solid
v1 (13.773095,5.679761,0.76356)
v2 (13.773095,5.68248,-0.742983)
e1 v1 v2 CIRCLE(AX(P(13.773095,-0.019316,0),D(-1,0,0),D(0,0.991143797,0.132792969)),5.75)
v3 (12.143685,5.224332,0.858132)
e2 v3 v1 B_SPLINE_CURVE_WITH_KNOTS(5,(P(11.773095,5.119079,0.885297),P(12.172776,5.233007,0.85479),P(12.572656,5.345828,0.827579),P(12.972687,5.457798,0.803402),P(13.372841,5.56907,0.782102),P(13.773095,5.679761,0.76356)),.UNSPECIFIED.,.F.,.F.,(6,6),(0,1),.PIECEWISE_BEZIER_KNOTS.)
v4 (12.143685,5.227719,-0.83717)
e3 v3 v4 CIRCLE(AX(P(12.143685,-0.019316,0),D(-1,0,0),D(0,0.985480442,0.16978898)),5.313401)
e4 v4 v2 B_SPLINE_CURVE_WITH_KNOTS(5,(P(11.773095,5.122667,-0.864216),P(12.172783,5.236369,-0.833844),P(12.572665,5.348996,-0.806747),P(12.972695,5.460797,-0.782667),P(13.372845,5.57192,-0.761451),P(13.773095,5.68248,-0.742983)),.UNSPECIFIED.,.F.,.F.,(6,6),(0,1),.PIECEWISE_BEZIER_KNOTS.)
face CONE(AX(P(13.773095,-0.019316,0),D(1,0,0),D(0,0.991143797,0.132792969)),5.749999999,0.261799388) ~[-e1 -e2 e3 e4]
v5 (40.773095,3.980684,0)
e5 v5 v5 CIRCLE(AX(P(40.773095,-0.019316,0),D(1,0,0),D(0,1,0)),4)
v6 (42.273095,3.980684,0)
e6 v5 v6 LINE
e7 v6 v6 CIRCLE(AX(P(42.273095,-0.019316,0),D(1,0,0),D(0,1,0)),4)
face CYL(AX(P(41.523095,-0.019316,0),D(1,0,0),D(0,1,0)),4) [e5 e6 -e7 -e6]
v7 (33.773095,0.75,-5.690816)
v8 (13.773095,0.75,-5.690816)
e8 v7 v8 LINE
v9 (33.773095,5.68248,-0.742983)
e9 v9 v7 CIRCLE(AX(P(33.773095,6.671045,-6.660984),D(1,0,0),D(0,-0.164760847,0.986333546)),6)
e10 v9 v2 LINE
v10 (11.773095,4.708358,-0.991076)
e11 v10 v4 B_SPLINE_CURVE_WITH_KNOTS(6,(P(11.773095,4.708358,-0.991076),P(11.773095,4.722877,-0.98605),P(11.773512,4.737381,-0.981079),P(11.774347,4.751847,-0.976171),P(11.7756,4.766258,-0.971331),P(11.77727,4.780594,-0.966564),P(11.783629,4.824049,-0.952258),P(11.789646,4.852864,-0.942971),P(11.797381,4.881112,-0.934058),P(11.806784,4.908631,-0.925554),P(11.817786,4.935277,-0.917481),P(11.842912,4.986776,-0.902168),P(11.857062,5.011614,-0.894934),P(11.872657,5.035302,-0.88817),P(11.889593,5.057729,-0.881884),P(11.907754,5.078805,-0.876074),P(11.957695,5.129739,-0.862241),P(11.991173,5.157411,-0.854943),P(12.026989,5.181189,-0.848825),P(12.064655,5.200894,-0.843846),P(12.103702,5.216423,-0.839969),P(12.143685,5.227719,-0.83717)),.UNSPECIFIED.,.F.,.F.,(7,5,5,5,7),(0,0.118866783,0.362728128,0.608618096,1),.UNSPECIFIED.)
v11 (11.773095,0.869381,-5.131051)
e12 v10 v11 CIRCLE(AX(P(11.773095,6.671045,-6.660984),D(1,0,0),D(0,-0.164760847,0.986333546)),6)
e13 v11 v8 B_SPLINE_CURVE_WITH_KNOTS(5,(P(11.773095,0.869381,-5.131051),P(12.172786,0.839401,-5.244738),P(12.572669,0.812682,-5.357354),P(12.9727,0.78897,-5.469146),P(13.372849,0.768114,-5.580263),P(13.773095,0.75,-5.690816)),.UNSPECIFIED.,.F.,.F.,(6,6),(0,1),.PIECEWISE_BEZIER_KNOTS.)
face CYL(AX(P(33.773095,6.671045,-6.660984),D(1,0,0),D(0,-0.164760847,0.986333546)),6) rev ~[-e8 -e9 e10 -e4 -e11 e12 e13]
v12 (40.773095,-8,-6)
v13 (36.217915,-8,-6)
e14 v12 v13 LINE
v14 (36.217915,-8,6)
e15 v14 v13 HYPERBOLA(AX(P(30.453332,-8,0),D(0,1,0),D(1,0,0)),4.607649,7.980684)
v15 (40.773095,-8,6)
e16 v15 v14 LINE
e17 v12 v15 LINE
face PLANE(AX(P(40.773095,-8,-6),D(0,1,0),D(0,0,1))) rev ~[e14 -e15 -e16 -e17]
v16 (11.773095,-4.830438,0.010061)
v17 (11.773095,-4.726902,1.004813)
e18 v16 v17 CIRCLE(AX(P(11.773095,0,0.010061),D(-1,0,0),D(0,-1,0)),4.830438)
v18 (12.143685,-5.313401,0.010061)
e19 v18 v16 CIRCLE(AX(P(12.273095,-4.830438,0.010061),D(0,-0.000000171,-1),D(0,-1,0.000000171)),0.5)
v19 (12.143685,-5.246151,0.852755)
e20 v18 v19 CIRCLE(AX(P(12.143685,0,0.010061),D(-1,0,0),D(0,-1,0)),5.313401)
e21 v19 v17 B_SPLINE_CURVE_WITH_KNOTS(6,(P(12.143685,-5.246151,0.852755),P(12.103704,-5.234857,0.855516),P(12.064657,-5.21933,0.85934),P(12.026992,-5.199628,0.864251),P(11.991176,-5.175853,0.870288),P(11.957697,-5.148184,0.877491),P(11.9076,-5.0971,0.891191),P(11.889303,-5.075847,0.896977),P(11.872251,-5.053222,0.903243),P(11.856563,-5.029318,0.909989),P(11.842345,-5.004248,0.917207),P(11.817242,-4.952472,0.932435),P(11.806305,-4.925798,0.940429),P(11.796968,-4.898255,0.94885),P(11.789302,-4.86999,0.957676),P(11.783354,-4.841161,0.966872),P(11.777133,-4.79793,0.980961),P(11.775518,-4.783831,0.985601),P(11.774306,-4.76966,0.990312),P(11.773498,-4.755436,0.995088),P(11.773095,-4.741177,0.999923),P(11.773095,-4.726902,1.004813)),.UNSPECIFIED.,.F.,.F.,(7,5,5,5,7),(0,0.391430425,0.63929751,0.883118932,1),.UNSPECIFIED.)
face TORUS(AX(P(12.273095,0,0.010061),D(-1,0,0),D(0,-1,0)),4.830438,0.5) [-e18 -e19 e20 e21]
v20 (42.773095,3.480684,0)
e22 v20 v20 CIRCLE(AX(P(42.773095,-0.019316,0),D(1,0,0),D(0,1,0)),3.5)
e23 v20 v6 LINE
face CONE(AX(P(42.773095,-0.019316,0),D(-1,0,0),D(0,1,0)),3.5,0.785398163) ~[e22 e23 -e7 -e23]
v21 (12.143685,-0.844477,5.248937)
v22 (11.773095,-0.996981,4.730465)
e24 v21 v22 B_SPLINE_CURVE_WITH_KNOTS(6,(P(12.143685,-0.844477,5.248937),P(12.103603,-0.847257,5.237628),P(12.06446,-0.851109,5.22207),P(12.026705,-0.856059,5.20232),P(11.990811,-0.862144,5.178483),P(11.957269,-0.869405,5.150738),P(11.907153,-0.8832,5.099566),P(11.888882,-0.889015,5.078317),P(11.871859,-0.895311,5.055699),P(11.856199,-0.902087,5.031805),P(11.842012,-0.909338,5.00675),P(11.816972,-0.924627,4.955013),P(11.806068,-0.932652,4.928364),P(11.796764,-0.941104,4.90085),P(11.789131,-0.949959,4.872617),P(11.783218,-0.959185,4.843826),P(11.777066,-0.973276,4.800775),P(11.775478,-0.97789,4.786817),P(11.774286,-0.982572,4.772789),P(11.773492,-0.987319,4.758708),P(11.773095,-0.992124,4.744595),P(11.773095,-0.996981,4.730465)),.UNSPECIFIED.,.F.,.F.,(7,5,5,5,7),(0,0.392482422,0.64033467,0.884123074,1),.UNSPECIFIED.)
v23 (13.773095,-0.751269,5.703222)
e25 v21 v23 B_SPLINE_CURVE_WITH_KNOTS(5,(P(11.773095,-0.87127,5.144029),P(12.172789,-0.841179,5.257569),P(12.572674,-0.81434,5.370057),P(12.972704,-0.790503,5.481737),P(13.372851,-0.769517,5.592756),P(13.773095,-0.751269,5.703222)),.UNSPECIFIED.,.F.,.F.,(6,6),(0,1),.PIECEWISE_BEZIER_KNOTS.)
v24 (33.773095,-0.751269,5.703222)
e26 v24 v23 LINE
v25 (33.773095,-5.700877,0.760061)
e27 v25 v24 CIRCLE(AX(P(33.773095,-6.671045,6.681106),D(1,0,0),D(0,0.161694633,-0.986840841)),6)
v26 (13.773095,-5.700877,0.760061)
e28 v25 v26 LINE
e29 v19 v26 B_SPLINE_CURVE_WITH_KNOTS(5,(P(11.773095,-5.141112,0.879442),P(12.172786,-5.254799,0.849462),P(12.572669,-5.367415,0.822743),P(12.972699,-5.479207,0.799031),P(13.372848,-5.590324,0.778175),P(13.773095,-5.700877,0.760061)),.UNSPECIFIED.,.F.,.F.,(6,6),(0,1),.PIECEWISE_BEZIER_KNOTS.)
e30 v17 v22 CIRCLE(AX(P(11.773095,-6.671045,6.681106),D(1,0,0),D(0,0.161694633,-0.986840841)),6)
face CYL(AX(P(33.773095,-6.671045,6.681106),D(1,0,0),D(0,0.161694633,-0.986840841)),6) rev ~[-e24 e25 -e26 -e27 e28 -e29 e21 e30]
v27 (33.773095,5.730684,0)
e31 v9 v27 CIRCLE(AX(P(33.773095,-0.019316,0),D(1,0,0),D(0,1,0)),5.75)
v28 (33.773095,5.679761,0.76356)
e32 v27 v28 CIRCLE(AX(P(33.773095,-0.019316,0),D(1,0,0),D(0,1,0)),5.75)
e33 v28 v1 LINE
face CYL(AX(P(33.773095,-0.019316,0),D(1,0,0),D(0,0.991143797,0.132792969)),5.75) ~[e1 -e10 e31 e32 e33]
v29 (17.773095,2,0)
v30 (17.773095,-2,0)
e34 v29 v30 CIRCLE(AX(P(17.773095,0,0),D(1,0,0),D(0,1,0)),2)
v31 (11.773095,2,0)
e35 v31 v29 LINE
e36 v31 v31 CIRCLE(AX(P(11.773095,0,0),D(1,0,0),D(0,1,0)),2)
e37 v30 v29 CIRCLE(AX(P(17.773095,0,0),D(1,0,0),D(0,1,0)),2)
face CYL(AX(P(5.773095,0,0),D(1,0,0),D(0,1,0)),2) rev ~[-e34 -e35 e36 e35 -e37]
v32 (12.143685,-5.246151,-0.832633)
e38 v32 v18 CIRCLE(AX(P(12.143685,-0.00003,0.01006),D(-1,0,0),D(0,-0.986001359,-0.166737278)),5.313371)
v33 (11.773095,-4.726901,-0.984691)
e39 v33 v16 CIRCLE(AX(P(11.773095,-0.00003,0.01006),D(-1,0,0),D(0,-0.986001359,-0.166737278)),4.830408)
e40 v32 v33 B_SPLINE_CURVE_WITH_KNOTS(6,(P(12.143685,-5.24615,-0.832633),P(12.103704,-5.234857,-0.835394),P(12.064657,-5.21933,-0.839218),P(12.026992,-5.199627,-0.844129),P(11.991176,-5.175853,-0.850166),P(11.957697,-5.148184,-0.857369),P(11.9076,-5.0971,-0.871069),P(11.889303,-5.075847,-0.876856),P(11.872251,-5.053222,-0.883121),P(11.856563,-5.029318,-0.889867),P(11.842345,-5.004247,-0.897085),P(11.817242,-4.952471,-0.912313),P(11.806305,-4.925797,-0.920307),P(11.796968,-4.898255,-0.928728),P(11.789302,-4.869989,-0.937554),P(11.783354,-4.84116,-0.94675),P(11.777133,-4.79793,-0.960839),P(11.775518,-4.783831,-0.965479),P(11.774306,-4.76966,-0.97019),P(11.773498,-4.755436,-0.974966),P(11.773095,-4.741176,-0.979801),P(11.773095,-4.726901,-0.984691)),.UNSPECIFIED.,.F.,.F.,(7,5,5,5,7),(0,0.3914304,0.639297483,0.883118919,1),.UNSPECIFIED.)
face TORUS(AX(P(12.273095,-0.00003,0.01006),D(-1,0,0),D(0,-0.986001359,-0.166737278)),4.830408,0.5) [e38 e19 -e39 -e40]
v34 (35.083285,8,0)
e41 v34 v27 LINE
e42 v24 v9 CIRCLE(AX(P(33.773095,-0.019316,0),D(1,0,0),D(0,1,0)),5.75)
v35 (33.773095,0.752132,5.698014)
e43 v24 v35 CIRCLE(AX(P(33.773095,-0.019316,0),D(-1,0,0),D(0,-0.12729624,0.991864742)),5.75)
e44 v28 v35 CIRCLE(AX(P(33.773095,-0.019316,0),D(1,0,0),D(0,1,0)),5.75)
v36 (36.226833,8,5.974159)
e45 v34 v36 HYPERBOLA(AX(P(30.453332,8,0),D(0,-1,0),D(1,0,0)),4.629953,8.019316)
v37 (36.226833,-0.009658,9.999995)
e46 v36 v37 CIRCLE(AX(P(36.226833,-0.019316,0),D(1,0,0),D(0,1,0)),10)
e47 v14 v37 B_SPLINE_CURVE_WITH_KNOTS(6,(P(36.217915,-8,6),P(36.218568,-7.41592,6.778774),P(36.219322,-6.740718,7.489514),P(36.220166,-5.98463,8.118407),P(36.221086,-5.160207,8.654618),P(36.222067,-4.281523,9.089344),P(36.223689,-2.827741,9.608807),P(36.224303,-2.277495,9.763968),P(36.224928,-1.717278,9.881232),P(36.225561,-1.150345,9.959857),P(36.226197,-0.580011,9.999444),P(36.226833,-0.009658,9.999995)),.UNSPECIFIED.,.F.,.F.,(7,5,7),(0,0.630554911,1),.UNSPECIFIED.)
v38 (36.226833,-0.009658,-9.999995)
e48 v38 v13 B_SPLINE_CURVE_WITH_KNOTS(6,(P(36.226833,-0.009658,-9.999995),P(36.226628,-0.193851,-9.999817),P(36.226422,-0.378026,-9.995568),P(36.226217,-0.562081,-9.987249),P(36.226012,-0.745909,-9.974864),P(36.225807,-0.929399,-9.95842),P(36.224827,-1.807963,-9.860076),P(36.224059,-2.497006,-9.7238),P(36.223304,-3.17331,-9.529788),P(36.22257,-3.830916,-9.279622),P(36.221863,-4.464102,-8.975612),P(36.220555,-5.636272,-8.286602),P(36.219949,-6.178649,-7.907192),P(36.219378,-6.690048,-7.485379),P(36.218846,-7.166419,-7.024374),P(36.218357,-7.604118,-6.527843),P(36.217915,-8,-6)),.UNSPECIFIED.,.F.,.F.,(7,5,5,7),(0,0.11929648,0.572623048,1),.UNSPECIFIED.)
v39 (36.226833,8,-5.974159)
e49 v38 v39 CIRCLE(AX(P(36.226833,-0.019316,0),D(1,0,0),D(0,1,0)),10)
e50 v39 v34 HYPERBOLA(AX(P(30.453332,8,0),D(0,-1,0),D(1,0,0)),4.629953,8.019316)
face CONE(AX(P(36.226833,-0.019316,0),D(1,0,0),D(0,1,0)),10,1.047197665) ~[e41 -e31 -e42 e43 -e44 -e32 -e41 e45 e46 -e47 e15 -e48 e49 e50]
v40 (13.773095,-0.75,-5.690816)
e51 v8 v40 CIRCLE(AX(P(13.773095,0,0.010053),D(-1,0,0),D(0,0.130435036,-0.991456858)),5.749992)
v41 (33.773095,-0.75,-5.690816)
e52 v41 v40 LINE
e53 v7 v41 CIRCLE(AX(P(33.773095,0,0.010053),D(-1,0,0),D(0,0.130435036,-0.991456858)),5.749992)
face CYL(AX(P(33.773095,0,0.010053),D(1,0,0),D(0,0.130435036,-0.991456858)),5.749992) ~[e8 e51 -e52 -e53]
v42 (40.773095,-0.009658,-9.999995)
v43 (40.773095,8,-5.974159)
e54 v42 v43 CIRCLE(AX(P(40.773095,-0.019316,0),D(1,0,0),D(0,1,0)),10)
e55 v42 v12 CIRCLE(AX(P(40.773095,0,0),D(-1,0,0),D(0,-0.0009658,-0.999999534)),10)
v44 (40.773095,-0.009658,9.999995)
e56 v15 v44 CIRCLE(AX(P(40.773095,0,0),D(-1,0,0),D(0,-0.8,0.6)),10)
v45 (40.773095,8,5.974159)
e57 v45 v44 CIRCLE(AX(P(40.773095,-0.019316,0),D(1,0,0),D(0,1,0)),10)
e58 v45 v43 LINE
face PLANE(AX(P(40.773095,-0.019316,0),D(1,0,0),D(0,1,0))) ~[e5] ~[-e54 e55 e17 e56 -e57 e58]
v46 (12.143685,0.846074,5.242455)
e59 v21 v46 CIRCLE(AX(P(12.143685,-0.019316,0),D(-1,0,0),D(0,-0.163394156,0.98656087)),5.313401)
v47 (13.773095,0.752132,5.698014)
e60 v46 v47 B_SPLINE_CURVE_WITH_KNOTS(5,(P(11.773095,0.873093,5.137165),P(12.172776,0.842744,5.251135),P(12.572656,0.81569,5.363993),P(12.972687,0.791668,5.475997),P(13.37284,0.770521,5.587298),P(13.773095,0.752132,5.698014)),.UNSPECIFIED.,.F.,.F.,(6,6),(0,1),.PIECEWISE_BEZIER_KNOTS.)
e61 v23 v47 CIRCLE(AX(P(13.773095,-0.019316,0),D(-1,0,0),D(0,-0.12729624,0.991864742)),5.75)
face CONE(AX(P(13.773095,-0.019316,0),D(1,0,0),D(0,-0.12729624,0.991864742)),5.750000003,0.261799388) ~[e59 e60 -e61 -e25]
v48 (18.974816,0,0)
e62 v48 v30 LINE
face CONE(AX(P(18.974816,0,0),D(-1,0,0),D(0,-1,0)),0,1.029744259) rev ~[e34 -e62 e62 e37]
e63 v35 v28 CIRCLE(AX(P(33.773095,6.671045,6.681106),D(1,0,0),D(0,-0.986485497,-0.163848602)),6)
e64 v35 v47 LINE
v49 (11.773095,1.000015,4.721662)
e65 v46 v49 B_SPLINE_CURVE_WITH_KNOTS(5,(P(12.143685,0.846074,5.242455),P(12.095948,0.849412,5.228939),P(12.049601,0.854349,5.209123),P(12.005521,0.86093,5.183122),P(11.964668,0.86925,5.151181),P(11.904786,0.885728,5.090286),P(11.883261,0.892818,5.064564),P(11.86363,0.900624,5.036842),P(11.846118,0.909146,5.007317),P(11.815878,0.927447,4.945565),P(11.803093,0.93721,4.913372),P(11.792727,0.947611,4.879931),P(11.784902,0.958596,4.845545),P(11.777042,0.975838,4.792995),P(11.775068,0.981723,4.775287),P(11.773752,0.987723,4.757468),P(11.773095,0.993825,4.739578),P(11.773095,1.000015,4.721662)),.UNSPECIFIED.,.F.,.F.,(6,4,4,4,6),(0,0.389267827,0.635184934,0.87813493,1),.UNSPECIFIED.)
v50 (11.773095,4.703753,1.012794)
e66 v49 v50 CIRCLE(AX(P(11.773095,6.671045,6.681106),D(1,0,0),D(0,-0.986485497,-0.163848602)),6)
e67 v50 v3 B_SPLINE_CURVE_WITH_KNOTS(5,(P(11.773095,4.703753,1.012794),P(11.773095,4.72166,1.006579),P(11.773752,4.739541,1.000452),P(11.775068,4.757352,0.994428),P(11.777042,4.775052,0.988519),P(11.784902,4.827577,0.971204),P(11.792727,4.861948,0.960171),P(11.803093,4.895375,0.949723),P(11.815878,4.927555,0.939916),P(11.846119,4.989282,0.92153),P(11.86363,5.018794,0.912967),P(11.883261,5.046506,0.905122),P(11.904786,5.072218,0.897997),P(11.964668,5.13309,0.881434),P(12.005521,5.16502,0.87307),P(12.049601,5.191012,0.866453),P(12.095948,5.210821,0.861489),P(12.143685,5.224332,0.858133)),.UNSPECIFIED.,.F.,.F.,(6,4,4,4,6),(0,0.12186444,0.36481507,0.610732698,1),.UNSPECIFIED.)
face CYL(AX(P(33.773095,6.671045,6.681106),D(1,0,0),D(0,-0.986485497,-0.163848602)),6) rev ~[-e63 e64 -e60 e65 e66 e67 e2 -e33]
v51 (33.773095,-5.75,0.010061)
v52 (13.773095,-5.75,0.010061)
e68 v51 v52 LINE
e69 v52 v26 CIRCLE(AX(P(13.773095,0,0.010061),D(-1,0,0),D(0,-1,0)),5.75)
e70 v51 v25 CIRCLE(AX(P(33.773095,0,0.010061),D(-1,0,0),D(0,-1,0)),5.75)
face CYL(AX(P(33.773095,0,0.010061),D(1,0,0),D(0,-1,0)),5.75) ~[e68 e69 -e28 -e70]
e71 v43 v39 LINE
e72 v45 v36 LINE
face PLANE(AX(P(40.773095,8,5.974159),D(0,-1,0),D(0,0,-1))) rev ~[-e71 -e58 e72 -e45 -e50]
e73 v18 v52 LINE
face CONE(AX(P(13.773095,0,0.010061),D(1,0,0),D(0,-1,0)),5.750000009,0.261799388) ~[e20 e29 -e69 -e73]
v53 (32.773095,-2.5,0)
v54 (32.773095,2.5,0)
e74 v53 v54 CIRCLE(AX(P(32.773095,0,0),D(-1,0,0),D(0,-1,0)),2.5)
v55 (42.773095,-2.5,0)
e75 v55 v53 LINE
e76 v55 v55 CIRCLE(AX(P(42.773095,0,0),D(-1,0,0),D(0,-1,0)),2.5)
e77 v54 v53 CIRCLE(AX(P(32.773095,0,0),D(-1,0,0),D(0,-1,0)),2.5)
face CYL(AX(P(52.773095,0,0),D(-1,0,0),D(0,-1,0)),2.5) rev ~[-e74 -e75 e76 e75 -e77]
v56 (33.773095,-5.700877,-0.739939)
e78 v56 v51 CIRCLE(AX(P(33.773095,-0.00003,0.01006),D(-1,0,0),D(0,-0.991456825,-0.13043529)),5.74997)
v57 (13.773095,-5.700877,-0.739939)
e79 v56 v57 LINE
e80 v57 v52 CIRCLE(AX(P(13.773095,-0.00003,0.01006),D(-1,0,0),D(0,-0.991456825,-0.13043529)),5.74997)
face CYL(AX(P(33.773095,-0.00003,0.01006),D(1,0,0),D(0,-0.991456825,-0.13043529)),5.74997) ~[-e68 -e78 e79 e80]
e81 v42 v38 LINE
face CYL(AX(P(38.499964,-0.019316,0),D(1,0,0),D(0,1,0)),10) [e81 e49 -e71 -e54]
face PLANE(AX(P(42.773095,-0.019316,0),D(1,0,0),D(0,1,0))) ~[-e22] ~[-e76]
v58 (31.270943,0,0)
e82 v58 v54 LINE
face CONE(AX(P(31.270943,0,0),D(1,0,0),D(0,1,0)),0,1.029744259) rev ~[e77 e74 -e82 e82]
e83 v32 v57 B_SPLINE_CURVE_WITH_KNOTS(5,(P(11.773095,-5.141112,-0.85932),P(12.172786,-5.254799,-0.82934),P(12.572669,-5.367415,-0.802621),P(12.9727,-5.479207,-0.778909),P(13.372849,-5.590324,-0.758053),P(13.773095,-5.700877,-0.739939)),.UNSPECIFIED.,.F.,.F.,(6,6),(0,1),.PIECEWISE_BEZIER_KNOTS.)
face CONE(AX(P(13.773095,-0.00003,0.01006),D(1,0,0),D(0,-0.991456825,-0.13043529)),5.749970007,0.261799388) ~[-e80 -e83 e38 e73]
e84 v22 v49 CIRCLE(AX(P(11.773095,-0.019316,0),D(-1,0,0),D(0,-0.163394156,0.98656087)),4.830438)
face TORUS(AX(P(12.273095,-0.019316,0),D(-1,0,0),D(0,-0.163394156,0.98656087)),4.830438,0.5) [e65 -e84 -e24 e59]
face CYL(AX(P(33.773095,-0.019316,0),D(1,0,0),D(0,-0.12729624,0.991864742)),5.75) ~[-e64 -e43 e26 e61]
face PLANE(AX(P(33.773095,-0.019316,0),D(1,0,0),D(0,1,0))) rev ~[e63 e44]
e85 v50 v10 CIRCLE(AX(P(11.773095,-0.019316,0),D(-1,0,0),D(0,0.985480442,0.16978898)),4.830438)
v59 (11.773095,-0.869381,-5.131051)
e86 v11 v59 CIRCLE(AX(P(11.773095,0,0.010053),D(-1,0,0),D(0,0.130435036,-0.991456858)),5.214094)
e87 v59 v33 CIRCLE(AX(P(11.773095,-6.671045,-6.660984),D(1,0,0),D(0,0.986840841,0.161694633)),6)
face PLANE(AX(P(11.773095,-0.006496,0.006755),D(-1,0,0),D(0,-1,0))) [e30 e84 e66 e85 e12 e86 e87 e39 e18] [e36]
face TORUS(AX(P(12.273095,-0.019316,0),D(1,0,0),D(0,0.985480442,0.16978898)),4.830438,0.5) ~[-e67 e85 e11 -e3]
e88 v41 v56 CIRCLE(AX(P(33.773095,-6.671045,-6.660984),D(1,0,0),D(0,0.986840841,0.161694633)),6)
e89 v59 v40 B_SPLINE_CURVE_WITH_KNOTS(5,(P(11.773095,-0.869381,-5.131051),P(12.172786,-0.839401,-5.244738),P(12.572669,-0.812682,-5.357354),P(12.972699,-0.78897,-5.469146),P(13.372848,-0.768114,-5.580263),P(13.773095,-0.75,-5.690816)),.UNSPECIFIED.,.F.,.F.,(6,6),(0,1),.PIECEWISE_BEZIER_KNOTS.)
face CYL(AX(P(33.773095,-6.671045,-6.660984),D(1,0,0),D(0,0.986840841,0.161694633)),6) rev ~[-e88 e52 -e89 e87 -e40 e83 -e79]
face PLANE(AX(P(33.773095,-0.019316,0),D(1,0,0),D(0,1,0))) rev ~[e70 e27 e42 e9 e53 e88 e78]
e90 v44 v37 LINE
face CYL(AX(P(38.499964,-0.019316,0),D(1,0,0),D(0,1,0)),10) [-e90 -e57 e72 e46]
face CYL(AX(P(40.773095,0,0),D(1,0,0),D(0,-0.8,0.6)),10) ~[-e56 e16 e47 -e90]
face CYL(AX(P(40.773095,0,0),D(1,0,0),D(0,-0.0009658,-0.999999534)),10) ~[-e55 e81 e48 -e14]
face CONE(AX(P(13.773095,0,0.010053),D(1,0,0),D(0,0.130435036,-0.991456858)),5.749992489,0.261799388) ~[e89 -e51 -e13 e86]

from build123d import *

# Parameters (mm, degrees)
F0_W      = 1.5
F0_H      = 1.5
F0_W_2    = 0.5
F0_H_2    = 0.435
F0_W_3    = 4.546262
F0_H_3    = 4
F0_H_4    = 2.065
F4_DEPTH  = 22
F5_SIZE2  = 2
F5_SIZE   = 0.5358983849
F6_R      = 0.5
F8_D      = 5
F8_DEPTH  = 10
F8_TIP    = 1.5021515476
F10_D     = 4
F10_DEPTH = 6
F10_TIP   = 1.2017212381
F12_DEPTH = 25


# Not quite as in the source:
# - ends of sketch curves that miss each other by under 0.0002 mm in the source are joined


with BuildPart() as f1:
    # F0 (on Top) → F1 (revolve)
    with BuildSketch(Plane.XY):
        with Locations((41.523095, 3.230684)):
            Rectangle(F0_W, F0_H)
        Polygon((33.773095, 5.681561), (33.773095, 2.480684), (37.5528260833, 2.480684), (36.226833, 5.980684), (36.226833, 9.980684), (33.773095, 5.730684), align=None)
        Polygon((36.226833, 5.980684), (37.5528260833, 2.480684), (39.4471019167, 2.480684), (40.773095, 5.980684), align=None)
        with Locations((42.523095, 2.263184)):
            Rectangle(F0_W_2, F0_H_2)
        Polygon((40.773095, 5.980684), (39.4471019167, 2.480684), (40.773095, 2.480684), (40.773095, 3.980684), align=None)
        with Locations((41.523095, 2.263184)):
            Rectangle(F0_W, F0_H_2)
        Polygon((42.273095, 3.980684), (42.273095, 2.480684), (42.773095, 2.480684), (42.773095, 3.480684), align=None)
        with Locations((38.499964, 7.980684)):
            Rectangle(F0_W_3, F0_H_3)
        with BuildLine():
            Line((40.773095, 2.045684), (40.773095, 0.7342315134))
            add(Edge.make_bspline(
                [(42.226833, -0.0193156), (42.2268322283, 0.4093938973), (40.773095, 0.7342315134)],
                knots=[3.141593, 3.141593, 3.141593, 3.8525916266, 3.8525916266, 3.8525916266], degree=2, weights=[1, 0.9374728154, 1]))
            Line((42.226833, -0.0193156), (42.273095, -0.019316))
            Line((42.273095, -0.019316), (42.273095, 2.045684))
            Line((42.273095, 2.045684), (40.773095, 2.045684))
        make_face()
        with Locations((42.523095, 1.013184)):
            Rectangle(F0_W_2, F0_H_4)
        Polygon((39.4471019167, 2.480684), (39.2822999192, 2.045684), (40.773095, 2.045684), (40.773095, 2.480684), align=None)
        with BuildLine():
            Line((33.773095, 0.730684), (33.773095, -0.019316))
            Line((33.773095, -0.019316), (34.273095, -0.019316))
            Line((34.273095, -0.019316), (38.499964, -0.019316))
            Line((38.499964, -0.019316), (38.0839828646, 1.0786791495))
            add(Edge.make_bspline(
                [(38.0839828646, 1.0786791495), (35.8841941746, 1.2164838646), (33.773095, 1.0344109623)],
                knots=[4.3976955436, 4.3976955436, 4.3976955436, 5.1336990724, 5.1336990724, 5.1336990724], degree=2, weights=[1, 0.9330480766, 1]))
            Line((33.773095, 1.0344109623), (33.773095, 0.730684))
        make_face()
        with BuildLine():
            Line((33.773095, 2.045684), (33.773095, 1.0344109623))
            add(Edge.make_bspline(
                [(38.0839828646, 1.0786791495), (35.8841941746, 1.2164838646), (33.773095, 1.0344109623)],
                knots=[4.3976955436, 4.3976955436, 4.3976955436, 5.1336990724, 5.1336990724, 5.1336990724], degree=2, weights=[1, 0.9330480766, 1]))
            Line((38.0839828646, 1.0786791495), (37.7176280808, 2.045684))
            Line((37.7176280808, 2.045684), (33.773095, 2.045684))
        make_face()
        Polygon((33.773095, 2.480684), (33.773095, 2.045684), (37.7176280808, 2.045684), (37.5528260833, 2.480684), align=None)
        with BuildLine():
            Line((37.7176280808, 2.045684), (38.0839828646, 1.0786791495))
            add(Edge.make_bspline(
                [(38.8919051119, 1.0152247595), (38.499964, 1.0526202094), (38.0839828646, 1.0786791495)],
                knots=[4.2521316371, 4.2521316371, 4.2521316371, 4.3976955436, 4.3976955436, 4.3976955436], degree=2, weights=[1, 0.9973525626, 1]))
            Line((38.8919051119, 1.0152247595), (39.2822999192, 2.045684))
            Line((39.2822999192, 2.045684), (37.7176280808, 2.045684))
        make_face()
        with BuildLine():
            Line((38.0839828646, 1.0786791495), (38.499964, -0.019316))
            Line((38.499964, -0.019316), (38.8919051119, 1.0152247595))
            add(Edge.make_bspline(
                [(38.8919051119, 1.0152247595), (38.499964, 1.0526202094), (38.0839828646, 1.0786791495)],
                knots=[4.2521316371, 4.2521316371, 4.2521316371, 4.3976955436, 4.3976955436, 4.3976955436], degree=2, weights=[1, 0.9973525626, 1]))
        make_face()
        with BuildLine():
            Line((38.8919051119, 1.0152247595), (38.499964, -0.019316))
            Line((38.499964, -0.019316), (40.773095, -0.019316))
            Line((40.773095, -0.019316), (40.773095, 0.7342315134))
            add(Edge.make_bspline(
                [(40.773095, 0.7342315134), (39.9803120127, 0.9113788897), (38.8919051119, 1.0152247595)],
                knots=[3.8525916266, 3.8525916266, 3.8525916266, 4.2521316371, 4.2521316371, 4.2521316371], degree=2, weights=[1, 0.9801122448, 1]))
        make_face()
        Polygon((37.5528260833, 2.480684), (37.7176280808, 2.045684), (39.2822999192, 2.045684), (39.4471019167, 2.480684), align=None)
        with BuildLine():
            Line((39.2822999192, 2.045684), (38.8919051119, 1.0152247595))
            add(Edge.make_bspline(
                [(40.773095, 0.7342315134), (39.9803120127, 0.9113788897), (38.8919051119, 1.0152247595)],
                knots=[3.8525916266, 3.8525916266, 3.8525916266, 4.2521316371, 4.2521316371, 4.2521316371], degree=2, weights=[1, 0.9801122448, 1]))
            Line((40.773095, 0.7342315134), (40.773095, 2.045684))
            Line((40.773095, 2.045684), (39.2822999192, 2.045684))
        make_face()
        with BuildLine():
            Line((40.773095, 0.7342315134), (40.773095, -0.019316))
            Line((40.773095, -0.019316), (42.226833, -0.019316))
            add(Edge.make_bspline(
                [(42.226833, -0.019316), (42.2268322283, 0.4093938973), (40.773095, 0.7342315134)],
                knots=[3.141593, 3.141593, 3.141593, 3.8525916266, 3.8525916266, 3.8525916266], degree=2, weights=[1, 0.9374728154, 1]))
        make_face()
    revolve(axis=Axis((20.5738751867, -0.019316, 0), (1, 0, 0)))

    # F3 (on face) → F4 (join)
    with BuildSketch(Plane(origin=(33.773095, 0, 0), x_dir=(0, -1, 0), z_dir=(-1, 0, 0))):
        with BuildLine():
            ThreePointArc((0.7512693785, 5.7032222692), (-0.000602262, 5.749965501), (-0.7521320187, 5.698014387))
            ThreePointArc((-0.7521320187, 5.698014387), (-2.4254688054, 2.4414028529), (-5.6797608355, 0.7635595739))
            ThreePointArc((-5.6797608355, 0.7635595739), (-5.7306746348, 0.0103778617), (-5.6824799161, -0.7429827264))
            ThreePointArc((-5.6824799161, -0.7429827264), (-2.4218166649, -2.4249412056), (-0.7499999869, -5.6908159978))
            ThreePointArc((-0.7499999869, -5.6908159978), (0, -5.739939), (0.7500000036, -5.690816125))
            ThreePointArc((0.7500000036, -5.690816125), (2.4284043129, -2.4183433129), (5.7008769978, -0.7399389869))
            ThreePointArc((5.7008769978, -0.7399389869), (5.7377061387, -0.3657424933), (5.75, 0.010061))
            ThreePointArc((5.75, 0.010061), (5.7377061387, 0.3858644933), (5.700877125, 0.7600610036))
            ThreePointArc((5.700877125, 0.7600610036), (2.4311698073, 2.43570162), (0.7512693785, 5.7032222692))
        make_face()
    extrude(amount=F4_DEPTH)

    # F5
    f5_edges = [f1.edges().sort_by_distance(p)[0] for p in [
        (11.773095, 0.000602, 5.749966),
        (11.773095, -5.737706, 0.385864),
        (11.773095, 0, -5.739939),
        (11.773095, 5.730675, 0.010378),
    ]]
    f5_side = f1.faces().sort_by_distance((11.773095, -0.002803, 0.008597))[0]
    chamfer(f5_edges, length=F5_SIZE, length2=F5_SIZE2, reference=f5_side)

    # F6
    f6_edges = [f1.edges().sort_by_distance(p)[0] for p in [
        (11.773095, 0.001201, 5.214061),
        (11.773095, 5.194775, 0.010692),
        (11.773095, -5.195822, 0.446281),
    ]]
    fillet(f6_edges, radius=F6_R)

    # F8
    with Locations(Plane.YZ.offset(42.773095)):
        with Locations((0, 0)):
            Hole(F8_D / 2, depth=F8_DEPTH)
            with Locations((0, 0, -(F8_DEPTH + F8_TIP / 2))):  # 118° drill point
                Cone(0, F8_D / 2, F8_TIP, mode=Mode.SUBTRACT)

    # F10
    with Locations(Plane(origin=(11.773095, 0, 0), x_dir=(0, -1, 0), z_dir=(-1, 0, 0))):
        with Locations((0, 0)):
            Hole(F10_D / 2, depth=F10_DEPTH)
            with Locations((0, 0, -(F10_DEPTH + F10_TIP / 2))):  # 118° drill point
                Cone(0, F10_D / 2, F10_TIP, mode=Mode.SUBTRACT)

    # F11 (on face) → F12 (cut)
    with BuildSketch(Plane.YZ.offset(40.773095)):
        with BuildLine():
            ThreePointArc((8, -5.9741585928), (9.4726058286, -3.1469699713), (9.980684, 0))
            ThreePointArc((9.980684, 0), (9.4726058286, 3.1469699713), (8, 5.9741585928))
            Line((8, 5.9741585928), (8, -5.9741585928))
        make_face()
        with BuildLine():
            ThreePointArc((-8, 6), (-4.476454623, 8.9421112724), (-0.009658, 9.9999953362))
            ThreePointArc((-0.009658, 9.9999953362), (-10.019316, 0), (-0.009658, -9.9999953362))
            ThreePointArc((-0.009658, -9.9999953362), (-4.476454623, -8.9421112724), (-8, -6))
            Line((-8, -6), (-8, 6))
        make_face()
    extrude(amount=-F12_DEPTH, mode=Mode.SUBTRACT)


solid = f1.part
